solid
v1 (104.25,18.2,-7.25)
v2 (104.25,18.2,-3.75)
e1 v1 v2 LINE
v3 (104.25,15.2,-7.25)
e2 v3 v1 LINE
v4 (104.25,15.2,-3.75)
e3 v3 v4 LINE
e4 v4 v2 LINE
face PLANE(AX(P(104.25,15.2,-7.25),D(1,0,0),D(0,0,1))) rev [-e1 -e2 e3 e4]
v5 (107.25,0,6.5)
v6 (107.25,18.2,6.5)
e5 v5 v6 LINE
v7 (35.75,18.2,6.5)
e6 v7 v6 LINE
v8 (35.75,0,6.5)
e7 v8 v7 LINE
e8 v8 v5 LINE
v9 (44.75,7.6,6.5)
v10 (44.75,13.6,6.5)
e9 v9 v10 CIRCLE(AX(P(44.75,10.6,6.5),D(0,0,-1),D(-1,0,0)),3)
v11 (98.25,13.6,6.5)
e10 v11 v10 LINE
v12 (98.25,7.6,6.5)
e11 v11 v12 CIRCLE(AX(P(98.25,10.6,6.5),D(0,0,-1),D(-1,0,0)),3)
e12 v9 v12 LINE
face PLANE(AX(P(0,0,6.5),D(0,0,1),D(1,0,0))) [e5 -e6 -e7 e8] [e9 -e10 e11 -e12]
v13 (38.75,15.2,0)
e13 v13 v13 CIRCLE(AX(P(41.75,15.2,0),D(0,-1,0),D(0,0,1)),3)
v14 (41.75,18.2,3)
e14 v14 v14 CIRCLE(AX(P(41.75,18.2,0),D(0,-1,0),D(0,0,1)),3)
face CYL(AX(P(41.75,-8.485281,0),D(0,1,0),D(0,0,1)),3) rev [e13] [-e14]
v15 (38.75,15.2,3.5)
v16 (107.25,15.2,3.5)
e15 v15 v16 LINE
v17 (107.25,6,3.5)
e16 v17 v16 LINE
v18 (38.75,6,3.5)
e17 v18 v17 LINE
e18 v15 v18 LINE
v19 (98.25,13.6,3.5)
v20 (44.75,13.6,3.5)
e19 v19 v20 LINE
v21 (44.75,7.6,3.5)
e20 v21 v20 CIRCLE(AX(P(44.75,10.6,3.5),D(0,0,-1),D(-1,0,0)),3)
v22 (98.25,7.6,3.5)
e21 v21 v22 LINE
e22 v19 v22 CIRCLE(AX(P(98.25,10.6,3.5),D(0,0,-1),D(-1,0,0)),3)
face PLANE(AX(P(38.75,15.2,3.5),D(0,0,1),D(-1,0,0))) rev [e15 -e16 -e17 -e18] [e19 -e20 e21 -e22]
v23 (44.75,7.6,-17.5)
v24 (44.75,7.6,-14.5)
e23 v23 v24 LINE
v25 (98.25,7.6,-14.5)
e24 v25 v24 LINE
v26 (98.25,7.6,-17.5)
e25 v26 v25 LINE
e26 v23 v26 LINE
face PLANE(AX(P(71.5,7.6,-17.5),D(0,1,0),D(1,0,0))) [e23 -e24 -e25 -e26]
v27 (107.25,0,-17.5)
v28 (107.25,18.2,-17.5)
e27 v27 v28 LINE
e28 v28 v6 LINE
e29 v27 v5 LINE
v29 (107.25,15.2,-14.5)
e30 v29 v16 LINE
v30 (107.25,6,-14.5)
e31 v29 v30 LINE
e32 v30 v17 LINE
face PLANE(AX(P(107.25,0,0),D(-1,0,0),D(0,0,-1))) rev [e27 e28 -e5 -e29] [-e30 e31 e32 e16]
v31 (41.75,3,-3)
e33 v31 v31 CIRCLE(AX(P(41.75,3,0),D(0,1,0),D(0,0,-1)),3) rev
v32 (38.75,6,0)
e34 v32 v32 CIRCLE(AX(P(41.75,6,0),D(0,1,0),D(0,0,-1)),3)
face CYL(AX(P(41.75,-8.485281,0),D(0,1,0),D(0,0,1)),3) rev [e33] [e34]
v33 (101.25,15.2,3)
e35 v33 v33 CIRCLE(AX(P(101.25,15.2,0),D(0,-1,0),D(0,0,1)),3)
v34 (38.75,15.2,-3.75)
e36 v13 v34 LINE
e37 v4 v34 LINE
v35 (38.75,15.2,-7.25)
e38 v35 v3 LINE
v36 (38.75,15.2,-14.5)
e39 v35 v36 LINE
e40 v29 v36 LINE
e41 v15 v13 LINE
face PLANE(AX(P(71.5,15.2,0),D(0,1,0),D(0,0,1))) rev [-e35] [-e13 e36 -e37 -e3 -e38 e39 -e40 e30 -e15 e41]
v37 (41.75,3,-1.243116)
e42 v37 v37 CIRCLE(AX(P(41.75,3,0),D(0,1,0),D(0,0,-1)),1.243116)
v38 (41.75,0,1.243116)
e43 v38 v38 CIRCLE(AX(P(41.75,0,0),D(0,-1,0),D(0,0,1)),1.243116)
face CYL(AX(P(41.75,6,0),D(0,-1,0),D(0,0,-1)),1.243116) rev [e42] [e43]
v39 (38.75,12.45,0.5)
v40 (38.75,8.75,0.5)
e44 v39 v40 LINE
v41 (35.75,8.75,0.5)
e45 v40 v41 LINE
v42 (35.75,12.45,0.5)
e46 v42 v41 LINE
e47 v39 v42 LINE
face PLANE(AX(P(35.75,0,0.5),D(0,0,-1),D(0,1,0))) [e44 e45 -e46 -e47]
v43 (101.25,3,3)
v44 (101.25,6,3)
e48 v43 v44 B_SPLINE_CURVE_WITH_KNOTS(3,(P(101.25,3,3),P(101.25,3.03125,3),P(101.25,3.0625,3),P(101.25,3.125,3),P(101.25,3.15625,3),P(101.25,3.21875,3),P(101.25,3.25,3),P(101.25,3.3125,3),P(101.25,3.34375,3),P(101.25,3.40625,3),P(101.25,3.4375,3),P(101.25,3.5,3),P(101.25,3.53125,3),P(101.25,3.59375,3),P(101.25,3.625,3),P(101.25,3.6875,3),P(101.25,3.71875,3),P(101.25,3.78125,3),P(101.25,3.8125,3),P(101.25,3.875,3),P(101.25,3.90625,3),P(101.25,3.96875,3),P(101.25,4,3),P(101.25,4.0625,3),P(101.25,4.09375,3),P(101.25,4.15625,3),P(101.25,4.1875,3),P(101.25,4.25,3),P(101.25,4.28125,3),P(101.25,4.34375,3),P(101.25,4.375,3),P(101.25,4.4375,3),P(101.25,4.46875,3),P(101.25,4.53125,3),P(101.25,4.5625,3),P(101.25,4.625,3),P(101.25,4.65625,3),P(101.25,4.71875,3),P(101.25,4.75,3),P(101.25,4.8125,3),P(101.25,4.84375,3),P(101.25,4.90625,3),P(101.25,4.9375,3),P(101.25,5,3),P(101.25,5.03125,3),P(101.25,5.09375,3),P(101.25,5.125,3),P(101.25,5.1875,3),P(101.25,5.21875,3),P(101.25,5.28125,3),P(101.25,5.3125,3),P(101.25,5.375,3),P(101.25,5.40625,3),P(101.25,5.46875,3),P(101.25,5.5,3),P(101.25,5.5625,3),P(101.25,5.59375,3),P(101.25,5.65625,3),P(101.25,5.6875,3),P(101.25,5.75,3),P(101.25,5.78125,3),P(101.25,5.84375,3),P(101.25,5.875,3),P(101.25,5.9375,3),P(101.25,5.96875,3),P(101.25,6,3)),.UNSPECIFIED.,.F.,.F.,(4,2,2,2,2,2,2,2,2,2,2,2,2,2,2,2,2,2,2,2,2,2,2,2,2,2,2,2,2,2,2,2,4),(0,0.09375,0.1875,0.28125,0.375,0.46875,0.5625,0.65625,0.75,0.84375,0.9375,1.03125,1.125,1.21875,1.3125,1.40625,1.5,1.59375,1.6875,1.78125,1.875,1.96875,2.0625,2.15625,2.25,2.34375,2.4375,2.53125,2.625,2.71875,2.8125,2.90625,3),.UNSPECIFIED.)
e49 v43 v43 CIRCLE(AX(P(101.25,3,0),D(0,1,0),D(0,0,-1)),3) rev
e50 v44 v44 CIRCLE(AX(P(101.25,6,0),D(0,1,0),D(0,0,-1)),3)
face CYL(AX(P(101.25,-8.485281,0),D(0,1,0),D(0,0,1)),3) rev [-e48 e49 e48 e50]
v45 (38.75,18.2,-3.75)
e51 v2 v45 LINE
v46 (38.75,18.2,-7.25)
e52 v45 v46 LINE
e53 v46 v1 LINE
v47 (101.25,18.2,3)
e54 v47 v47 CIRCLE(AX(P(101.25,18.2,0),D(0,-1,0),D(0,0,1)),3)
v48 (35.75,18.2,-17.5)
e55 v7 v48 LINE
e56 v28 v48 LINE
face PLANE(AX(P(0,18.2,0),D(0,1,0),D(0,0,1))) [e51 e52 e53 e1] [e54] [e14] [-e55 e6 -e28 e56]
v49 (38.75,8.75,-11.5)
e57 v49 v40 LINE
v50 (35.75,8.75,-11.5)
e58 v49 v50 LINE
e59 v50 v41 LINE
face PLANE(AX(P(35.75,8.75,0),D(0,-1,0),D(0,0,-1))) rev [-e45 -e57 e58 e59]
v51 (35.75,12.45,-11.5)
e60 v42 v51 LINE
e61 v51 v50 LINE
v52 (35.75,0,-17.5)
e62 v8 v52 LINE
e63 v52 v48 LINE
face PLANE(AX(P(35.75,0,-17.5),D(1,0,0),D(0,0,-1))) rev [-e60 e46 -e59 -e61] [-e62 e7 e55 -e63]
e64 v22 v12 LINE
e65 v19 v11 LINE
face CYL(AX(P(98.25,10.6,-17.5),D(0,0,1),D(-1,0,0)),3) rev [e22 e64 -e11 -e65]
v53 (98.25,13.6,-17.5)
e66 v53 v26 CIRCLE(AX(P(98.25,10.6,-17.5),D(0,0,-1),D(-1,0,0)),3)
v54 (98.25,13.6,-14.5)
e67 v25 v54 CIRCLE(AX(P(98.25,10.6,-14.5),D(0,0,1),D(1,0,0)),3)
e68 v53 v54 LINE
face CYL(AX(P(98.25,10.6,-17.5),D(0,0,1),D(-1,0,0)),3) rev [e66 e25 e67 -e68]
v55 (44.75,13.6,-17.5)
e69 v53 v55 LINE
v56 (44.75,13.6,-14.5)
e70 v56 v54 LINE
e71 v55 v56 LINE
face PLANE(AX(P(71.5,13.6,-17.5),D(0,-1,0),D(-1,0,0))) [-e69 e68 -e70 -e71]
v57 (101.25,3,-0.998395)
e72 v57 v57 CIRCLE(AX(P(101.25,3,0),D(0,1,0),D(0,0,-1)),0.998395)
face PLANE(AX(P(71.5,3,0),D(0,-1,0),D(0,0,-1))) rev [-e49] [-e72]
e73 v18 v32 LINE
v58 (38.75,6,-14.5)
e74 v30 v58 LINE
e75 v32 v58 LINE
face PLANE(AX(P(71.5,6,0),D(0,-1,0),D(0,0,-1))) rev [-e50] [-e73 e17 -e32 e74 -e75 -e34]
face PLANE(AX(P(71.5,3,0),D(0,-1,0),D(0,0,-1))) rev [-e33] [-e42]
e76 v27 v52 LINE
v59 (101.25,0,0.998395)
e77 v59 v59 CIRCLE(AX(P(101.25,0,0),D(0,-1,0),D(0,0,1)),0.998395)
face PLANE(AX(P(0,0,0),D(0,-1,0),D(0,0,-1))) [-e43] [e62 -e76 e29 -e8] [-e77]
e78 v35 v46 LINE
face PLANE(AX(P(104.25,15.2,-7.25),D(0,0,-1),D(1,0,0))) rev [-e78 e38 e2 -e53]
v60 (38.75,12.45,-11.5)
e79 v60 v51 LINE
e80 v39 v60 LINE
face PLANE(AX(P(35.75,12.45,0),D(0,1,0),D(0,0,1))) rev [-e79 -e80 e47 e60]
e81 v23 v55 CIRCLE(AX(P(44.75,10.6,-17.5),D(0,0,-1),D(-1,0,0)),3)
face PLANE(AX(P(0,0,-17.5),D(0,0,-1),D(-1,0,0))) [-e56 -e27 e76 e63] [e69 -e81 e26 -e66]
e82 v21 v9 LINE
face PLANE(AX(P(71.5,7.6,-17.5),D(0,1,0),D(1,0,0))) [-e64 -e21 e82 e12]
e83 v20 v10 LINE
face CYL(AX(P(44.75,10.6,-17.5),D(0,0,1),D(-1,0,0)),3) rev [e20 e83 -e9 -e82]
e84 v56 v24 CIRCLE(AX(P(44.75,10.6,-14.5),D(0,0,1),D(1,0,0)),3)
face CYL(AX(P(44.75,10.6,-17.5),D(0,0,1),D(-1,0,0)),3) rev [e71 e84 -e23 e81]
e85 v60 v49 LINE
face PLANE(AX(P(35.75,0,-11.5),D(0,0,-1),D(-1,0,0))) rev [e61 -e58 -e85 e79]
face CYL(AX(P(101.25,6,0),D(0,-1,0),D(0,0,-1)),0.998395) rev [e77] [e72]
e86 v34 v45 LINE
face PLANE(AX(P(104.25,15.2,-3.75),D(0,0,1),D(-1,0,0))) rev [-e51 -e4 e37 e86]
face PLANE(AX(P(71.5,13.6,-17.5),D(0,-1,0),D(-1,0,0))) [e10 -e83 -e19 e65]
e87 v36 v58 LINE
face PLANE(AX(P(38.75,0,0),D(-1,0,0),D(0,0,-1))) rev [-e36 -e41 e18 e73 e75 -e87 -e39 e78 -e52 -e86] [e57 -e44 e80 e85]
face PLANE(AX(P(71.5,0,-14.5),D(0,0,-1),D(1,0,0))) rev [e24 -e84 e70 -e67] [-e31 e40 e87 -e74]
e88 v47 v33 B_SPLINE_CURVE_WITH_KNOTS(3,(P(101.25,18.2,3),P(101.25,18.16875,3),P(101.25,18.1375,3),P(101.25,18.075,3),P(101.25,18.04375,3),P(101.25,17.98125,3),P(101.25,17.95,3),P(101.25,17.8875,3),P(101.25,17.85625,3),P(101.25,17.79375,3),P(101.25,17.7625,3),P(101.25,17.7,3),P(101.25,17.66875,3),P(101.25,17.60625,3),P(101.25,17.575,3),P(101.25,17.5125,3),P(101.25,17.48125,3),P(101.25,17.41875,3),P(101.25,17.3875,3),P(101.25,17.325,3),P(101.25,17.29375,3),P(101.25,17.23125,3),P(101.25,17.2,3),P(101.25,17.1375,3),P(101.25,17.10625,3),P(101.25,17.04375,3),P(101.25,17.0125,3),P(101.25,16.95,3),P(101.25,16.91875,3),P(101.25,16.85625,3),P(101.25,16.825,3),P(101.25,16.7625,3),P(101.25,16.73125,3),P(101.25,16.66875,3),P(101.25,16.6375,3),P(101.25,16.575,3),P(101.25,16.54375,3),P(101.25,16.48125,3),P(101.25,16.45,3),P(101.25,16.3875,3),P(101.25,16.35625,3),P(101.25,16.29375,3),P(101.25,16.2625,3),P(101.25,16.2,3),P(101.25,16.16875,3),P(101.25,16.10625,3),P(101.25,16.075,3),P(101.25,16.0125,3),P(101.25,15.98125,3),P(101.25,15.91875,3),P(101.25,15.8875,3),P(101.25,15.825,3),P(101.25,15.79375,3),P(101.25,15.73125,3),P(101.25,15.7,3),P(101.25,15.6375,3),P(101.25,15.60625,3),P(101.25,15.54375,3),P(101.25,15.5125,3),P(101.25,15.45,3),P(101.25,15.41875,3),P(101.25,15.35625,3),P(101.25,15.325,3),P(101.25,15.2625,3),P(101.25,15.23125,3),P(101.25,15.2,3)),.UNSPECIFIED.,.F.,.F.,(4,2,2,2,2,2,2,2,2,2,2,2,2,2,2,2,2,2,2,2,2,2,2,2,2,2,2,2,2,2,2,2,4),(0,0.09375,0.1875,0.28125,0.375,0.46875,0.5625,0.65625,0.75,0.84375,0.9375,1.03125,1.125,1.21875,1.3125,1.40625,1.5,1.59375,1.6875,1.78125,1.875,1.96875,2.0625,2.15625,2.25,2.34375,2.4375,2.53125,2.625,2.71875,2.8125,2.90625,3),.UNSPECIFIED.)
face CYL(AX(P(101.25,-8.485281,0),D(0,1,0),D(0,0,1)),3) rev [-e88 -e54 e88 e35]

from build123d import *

# Parameters (mm, degrees)
SKETCH1_W              = 65.5
SKETCH1_H              = 9
SKETCH1_R              = 0.998395378
SKETCH1_R_2            = 1.243115981
BOSS_EXTRUDE1_DEPTH    = 6
SKETCH3_W              = 65.5
SKETCH3_H              = 6
BOSS_EXTRUDE2_DEPTH    = 10
SKETCH4_W              = 65.5
SKETCH4_H              = 6
BOSS_EXTRUDE3_DEPTH    = 2
SKETCH5_W              = 65.5
SKETCH5_H              = 3
BOSS_EXTRUDE4_DEPTH    = 9.2
SKETCH7_W              = 21
SKETCH7_H              = 15.2
BOSS_EXTRUDE6_DEPTH    = 3
SKETCH12_W             = 68.5
SKETCH12_H             = 15.2
BOSS_EXTRUDE10_DEPTH   = 3
SKETCH13_W             = 24
SKETCH13_H             = 15.2
SKETCH13_W_2           = 12
SKETCH13_H_2           = 3.7
BOSS_EXTRUDE11_DEPTH   = 3
CUT_EXTRUDE2_DEPTH     = 46.662922596
SKETCH11_W             = 18
SKETCH11_H             = 9.2
CUT_EXTRUDE4_DEPTH     = 3
SKETCH14_W             = 71.5
SKETCH14_H             = 24
BOSS_EXTRUDE12_DEPTH   = 3
SKETCH15_W             = 65.5
SKETCH15_H             = 3.5
CUT_EXTRUDE5_DEPTH     = 3
SKETCH16_R             = 3
CUT_EXTRUDE6_DEPTH     = 15.2
MIRROR10_OUTLINE_W     = 71.5
MIRROR10_OUTLINE_H     = 24
MIRROR10_OUTLINE_R     = 3
MIRROR10_DEPTH         = 6
MIRROR10_START         = 6
MIRROR10_2_DEPTH       = 12.2
MIRROR10_START_2       = 15.2
MIRROR10_3_OUTLINE_W   = 65.5
MIRROR10_3_OUTLINE_H   = 3.5
MIRROR10_3_OUTLINE_R   = 3
MIRROR10_3_DEPTH       = 3
MIRROR10_4_OUTLINE_R   = 3
MIRROR10_4_OUTLINE_R_2 = 1.243115981
MIRROR10_4_OUTLINE_R_3 = 0.998395378
MIRROR10_4_DEPTH       = 3
MIRROR10_5_OUTLINE_W   = 3
MIRROR10_5_OUTLINE_H   = 12
MIRROR10_5_DEPTH       = 2.75
MIRROR10_START_3       = 12.45
MIRROR10_6_OUTLINE_W   = 3
MIRROR10_6_OUTLINE_H   = 12
MIRROR10_6_DEPTH       = 2.75
MIRROR10_START_4       = -17.5
MIRROR10_7_DEPTH       = 24
SKETCH17_W             = 71.5
SKETCH17_H             = 24
CUT_EXTRUDE7_DEPTH     = 111.181906409


with BuildPart() as part:
    # Sketch1 → Boss-Extrude1 (new body)
    with BuildSketch(Plane(origin=(0, 0, 0), x_dir=(1, 0, 0), z_dir=(0, 1, 0))):
        Rectangle(SKETCH1_W, SKETCH1_H)
        with Locations(Location((-29.75, 0, 0), (0, 0, 270))):
            Circle(SKETCH1_R, mode=Mode.SUBTRACT)
        with Locations(Location((29.75, 0, 0), (0, 0, 270))):
            Circle(SKETCH1_R_2, mode=Mode.SUBTRACT)
    extrude(amount=BOSS_EXTRUDE1_DEPTH)

    # Sketch3 → Boss-Extrude2 (add)
    with BuildSketch(Plane(origin=(0, 0, -4.5), x_dir=(-1, 0, 0), z_dir=(0, 0, -1))):
        with Locations((0, 3)):
            Rectangle(SKETCH3_W, SKETCH3_H)
    extrude(amount=BOSS_EXTRUDE2_DEPTH)

    # Sketch4 → Boss-Extrude3 (add)
    with BuildSketch(Plane.XY.offset(4.5)):
        with Locations((0, 3)):
            Rectangle(SKETCH4_W, SKETCH4_H)
    extrude(amount=BOSS_EXTRUDE3_DEPTH)

    # Sketch5 → Boss-Extrude4 (add)
    with BuildSketch(Plane(origin=(0, 6, 0), x_dir=(1, 0, 0), z_dir=(0, 1, 0))):
        with Locations((0, -5)):
            Rectangle(SKETCH5_W, SKETCH5_H)
    extrude(amount=BOSS_EXTRUDE4_DEPTH)

    # Sketch7 → Boss-Extrude6 (add)
    with BuildSketch(Plane.ZY.offset(32.75)):
        with Locations((-4, 7.6)):
            Rectangle(SKETCH7_W, SKETCH7_H)
    extrude(amount=BOSS_EXTRUDE6_DEPTH)

    # Sketch12 → Boss-Extrude10 (add)
    with BuildSketch(Plane(origin=(0, 0, -14.5), x_dir=(-1, 0, 0), z_dir=(0, 0, -1))):
        with Locations((1.5, 7.6)):
            Rectangle(SKETCH12_W, SKETCH12_H)
    extrude(amount=BOSS_EXTRUDE10_DEPTH)

    # Sketch13 → Boss-Extrude11 (add)
    with BuildSketch(Plane(origin=(32.75, 0, 0), x_dir=(0, 0, -1), z_dir=(1, 0, 0))):
        with Locations((5.5, 7.6)):
            Rectangle(SKETCH13_W, SKETCH13_H)
        with Locations((5.5, 10.6)):
            Rectangle(SKETCH13_W_2, SKETCH13_H_2, mode=Mode.SUBTRACT)
    extrude(amount=BOSS_EXTRUDE11_DEPTH)

    # Sketch6 → Cut-Extrude2 (cut, through all)
    with BuildSketch(Plane.XY.offset(6.5)):
        with BuildLine():
            ThreePointArc((-23.75, 10.6), (-24.628679656, 12.721320344), (-26.75, 13.6))
            Line((-26.75, 13.6), (-26.75, 7.6))
            ThreePointArc((-26.75, 7.6), (-24.628679656, 8.478679656), (-23.75, 10.6))
        make_face()
        with BuildLine():
            Line((-26.75, 7.6), (-26.75, 13.6))
            ThreePointArc((-26.75, 13.6), (-29.75, 10.6), (-26.75, 7.6))
        make_face()
        with BuildLine():
            ThreePointArc((29.75, 10.6), (28.871320344, 12.721320344), (26.75, 13.6))
            Line((26.75, 13.6), (26.75, 7.6))
            ThreePointArc((26.75, 7.6), (28.871320344, 8.478679656), (29.75, 10.6))
        make_face()
        with BuildLine():
            Line((26.75, 7.6), (26.75, 13.6))
            ThreePointArc((26.75, 13.6), (23.75, 10.6), (26.75, 7.6))
        make_face()
        with BuildLine():
            Line((26.75, 13.6), (-26.75, 13.6))
            ThreePointArc((-26.75, 13.6), (-24.628679656, 12.721320344), (-23.75, 10.6))
            ThreePointArc((-23.75, 10.6), (-24.628679656, 8.478679656), (-26.75, 7.6))
            Line((-26.75, 7.6), (26.75, 7.6))
            ThreePointArc((26.75, 7.6), (23.75, 10.6), (26.75, 13.6))
        make_face()
    extrude(amount=-CUT_EXTRUDE2_DEPTH, mode=Mode.SUBTRACT)

    # Sketch11 → Cut-Extrude4 (cut)
    with BuildSketch(Plane.ZY.offset(35.75)):
        with Locations((-5.5, 10.6)):
            Rectangle(SKETCH11_W, SKETCH11_H)
    extrude(amount=-CUT_EXTRUDE4_DEPTH, mode=Mode.SUBTRACT)

    # Sketch14 → Boss-Extrude12 (add)
    with BuildSketch(Plane(origin=(0, 15.2, 0), x_dir=(1, 0, 0), z_dir=(0, 1, 0))):
        with Locations((0, 5.5)):
            Rectangle(SKETCH14_W, SKETCH14_H)
    extrude(amount=BOSS_EXTRUDE12_DEPTH)

    # Sketch15 → Cut-Extrude5 (cut)
    with BuildSketch(Plane(origin=(0, 18.2, 0), x_dir=(1, 0, 0), z_dir=(0, 1, 0))):
        with Locations((0, 5.5)):
            Rectangle(SKETCH15_W, SKETCH15_H)
    extrude(amount=-CUT_EXTRUDE5_DEPTH, mode=Mode.SUBTRACT)

    # Sketch16 → Cut-Extrude6 (cut)
    with BuildSketch(Plane(origin=(0, 18.2, 0), x_dir=(1, 0, 0), z_dir=(0, 1, 0))):
        with Locations(Location((-29.75, 0, 0), (0, 0, 270))):
            Circle(SKETCH16_R)
        with Locations(Location((29.75, 0, 0), (0, 0, 270))):
            Circle(SKETCH16_R)
    extrude(amount=-CUT_EXTRUDE6_DEPTH, mode=Mode.SUBTRACT)

    # Mirror10: read off the stored shape, not the designer's step
    # Mirror10 outline → Mirror10 (add)
    with BuildSketch(Plane(origin=(0, 0, 0), x_dir=(1, 0, 0), z_dir=(0, 1, 0))):
        with Locations((71.5, 5.5)):
            Rectangle(MIRROR10_OUTLINE_W, MIRROR10_OUTLINE_H)
        with Locations((41.75, 0)):
            Circle(MIRROR10_OUTLINE_R, mode=Mode.SUBTRACT)
        with Locations((101.25, 0)):
            Circle(MIRROR10_OUTLINE_R, mode=Mode.SUBTRACT)
    extrude(amount=MIRROR10_DEPTH)

    # Mirror10 2 outline → Mirror10 2 (add)
    with BuildSketch(Plane(origin=(0, 0, 0), x_dir=(1, 0, 0), z_dir=(0, 1, 0)).offset(MIRROR10_START)):
        Polygon((35.75, -0.5), (35.75, -6.5), (107.25, -6.5), (107.25, -3.5), (38.75, -3.5), (38.75, -0.5), align=None)
        Polygon((35.75, 17.5), (35.75, 11.5), (38.75, 11.5), (38.75, 14.5), (107.25, 14.5), (107.25, 17.5), align=None)
    extrude(amount=MIRROR10_2_DEPTH)

    # Mirror10 3 outline → Mirror10 3 (add)
    with BuildSketch(Plane(origin=(0, 0, 0), x_dir=(1, 0, 0), z_dir=(0, 1, 0)).offset(MIRROR10_START_2)):
        Polygon((35.75, 11.5), (35.75, -0.5), (38.75, -0.5), (38.75, -3.5), (107.25, -3.5), (107.25, 14.5), (38.75, 14.5), (38.75, 11.5), align=None)
        with Locations((71.5, 5.5)):
            Rectangle(MIRROR10_3_OUTLINE_W, MIRROR10_3_OUTLINE_H, mode=Mode.SUBTRACT)
        with Locations((41.75, 0)):
            Circle(MIRROR10_3_OUTLINE_R, mode=Mode.SUBTRACT)
        with Locations((101.25, 0)):
            Circle(MIRROR10_3_OUTLINE_R, mode=Mode.SUBTRACT)
    extrude(amount=MIRROR10_3_DEPTH)

    # Mirror10 4 outline → Mirror10 4 (add)
    # profile 1 of 2: a face of its own
    with BuildSketch(Plane(origin=(0, 0, 0), x_dir=(1, 0, 0), z_dir=(0, 1, 0))):
        with Locations((41.75, 0)):
            Circle(MIRROR10_4_OUTLINE_R)
        with Locations((41.75, 0)):
            Circle(MIRROR10_4_OUTLINE_R_2, mode=Mode.SUBTRACT)
    # profile 2 of 2: a face of its own
    with BuildSketch(Plane(origin=(0, 0, 0), x_dir=(1, 0, 0), z_dir=(0, 1, 0))):
        with Locations((101.25, 0)):
            Circle(MIRROR10_4_OUTLINE_R)
        with Locations((101.25, 0)):
            Circle(MIRROR10_4_OUTLINE_R_3, mode=Mode.SUBTRACT)
    extrude(amount=MIRROR10_4_DEPTH)

    # Mirror10 5 outline → Mirror10 5 (add)
    with BuildSketch(Plane(origin=(0, 0, 0), x_dir=(1, 0, 0), z_dir=(0, 1, 0)).offset(MIRROR10_START)):
        with Locations((37.25, 5.5)):
            Rectangle(MIRROR10_5_OUTLINE_W, MIRROR10_5_OUTLINE_H)
    extrude(amount=MIRROR10_5_DEPTH)

    # Mirror10 6 outline → Mirror10 6 (add)
    with BuildSketch(Plane(origin=(0, 0, 0), x_dir=(1, 0, 0), z_dir=(0, 1, 0)).offset(MIRROR10_START_3)):
        with Locations((37.25, 5.5)):
            Rectangle(MIRROR10_6_OUTLINE_W, MIRROR10_6_OUTLINE_H)
    extrude(amount=MIRROR10_6_DEPTH)

    # Mirror10 7 outline → Mirror10 7 (cut)
    with BuildSketch(Plane.XY.offset(MIRROR10_START_4)):
        with BuildLine():
            Line((44.75, 7.6), (98.25, 7.6))
            ThreePointArc((98.25, 7.6), (101.25, 10.6), (98.25, 13.6))
            Line((98.25, 13.6), (44.75, 13.6))
            ThreePointArc((44.75, 13.6), (41.75, 10.6), (44.75, 7.6))
        make_face()
    extrude(amount=MIRROR10_7_DEPTH, mode=Mode.SUBTRACT)

    # Sketch17 → Cut-Extrude7 (cut, through all)
    with BuildSketch(Plane(origin=(0, 18.2, 0), x_dir=(1, 0, 0), z_dir=(0, 1, 0))):
        with Locations((0, 5.5)):
            Rectangle(SKETCH17_W, SKETCH17_H)
    extrude(amount=-CUT_EXTRUDE7_DEPTH, mode=Mode.SUBTRACT)


solid = part.part
